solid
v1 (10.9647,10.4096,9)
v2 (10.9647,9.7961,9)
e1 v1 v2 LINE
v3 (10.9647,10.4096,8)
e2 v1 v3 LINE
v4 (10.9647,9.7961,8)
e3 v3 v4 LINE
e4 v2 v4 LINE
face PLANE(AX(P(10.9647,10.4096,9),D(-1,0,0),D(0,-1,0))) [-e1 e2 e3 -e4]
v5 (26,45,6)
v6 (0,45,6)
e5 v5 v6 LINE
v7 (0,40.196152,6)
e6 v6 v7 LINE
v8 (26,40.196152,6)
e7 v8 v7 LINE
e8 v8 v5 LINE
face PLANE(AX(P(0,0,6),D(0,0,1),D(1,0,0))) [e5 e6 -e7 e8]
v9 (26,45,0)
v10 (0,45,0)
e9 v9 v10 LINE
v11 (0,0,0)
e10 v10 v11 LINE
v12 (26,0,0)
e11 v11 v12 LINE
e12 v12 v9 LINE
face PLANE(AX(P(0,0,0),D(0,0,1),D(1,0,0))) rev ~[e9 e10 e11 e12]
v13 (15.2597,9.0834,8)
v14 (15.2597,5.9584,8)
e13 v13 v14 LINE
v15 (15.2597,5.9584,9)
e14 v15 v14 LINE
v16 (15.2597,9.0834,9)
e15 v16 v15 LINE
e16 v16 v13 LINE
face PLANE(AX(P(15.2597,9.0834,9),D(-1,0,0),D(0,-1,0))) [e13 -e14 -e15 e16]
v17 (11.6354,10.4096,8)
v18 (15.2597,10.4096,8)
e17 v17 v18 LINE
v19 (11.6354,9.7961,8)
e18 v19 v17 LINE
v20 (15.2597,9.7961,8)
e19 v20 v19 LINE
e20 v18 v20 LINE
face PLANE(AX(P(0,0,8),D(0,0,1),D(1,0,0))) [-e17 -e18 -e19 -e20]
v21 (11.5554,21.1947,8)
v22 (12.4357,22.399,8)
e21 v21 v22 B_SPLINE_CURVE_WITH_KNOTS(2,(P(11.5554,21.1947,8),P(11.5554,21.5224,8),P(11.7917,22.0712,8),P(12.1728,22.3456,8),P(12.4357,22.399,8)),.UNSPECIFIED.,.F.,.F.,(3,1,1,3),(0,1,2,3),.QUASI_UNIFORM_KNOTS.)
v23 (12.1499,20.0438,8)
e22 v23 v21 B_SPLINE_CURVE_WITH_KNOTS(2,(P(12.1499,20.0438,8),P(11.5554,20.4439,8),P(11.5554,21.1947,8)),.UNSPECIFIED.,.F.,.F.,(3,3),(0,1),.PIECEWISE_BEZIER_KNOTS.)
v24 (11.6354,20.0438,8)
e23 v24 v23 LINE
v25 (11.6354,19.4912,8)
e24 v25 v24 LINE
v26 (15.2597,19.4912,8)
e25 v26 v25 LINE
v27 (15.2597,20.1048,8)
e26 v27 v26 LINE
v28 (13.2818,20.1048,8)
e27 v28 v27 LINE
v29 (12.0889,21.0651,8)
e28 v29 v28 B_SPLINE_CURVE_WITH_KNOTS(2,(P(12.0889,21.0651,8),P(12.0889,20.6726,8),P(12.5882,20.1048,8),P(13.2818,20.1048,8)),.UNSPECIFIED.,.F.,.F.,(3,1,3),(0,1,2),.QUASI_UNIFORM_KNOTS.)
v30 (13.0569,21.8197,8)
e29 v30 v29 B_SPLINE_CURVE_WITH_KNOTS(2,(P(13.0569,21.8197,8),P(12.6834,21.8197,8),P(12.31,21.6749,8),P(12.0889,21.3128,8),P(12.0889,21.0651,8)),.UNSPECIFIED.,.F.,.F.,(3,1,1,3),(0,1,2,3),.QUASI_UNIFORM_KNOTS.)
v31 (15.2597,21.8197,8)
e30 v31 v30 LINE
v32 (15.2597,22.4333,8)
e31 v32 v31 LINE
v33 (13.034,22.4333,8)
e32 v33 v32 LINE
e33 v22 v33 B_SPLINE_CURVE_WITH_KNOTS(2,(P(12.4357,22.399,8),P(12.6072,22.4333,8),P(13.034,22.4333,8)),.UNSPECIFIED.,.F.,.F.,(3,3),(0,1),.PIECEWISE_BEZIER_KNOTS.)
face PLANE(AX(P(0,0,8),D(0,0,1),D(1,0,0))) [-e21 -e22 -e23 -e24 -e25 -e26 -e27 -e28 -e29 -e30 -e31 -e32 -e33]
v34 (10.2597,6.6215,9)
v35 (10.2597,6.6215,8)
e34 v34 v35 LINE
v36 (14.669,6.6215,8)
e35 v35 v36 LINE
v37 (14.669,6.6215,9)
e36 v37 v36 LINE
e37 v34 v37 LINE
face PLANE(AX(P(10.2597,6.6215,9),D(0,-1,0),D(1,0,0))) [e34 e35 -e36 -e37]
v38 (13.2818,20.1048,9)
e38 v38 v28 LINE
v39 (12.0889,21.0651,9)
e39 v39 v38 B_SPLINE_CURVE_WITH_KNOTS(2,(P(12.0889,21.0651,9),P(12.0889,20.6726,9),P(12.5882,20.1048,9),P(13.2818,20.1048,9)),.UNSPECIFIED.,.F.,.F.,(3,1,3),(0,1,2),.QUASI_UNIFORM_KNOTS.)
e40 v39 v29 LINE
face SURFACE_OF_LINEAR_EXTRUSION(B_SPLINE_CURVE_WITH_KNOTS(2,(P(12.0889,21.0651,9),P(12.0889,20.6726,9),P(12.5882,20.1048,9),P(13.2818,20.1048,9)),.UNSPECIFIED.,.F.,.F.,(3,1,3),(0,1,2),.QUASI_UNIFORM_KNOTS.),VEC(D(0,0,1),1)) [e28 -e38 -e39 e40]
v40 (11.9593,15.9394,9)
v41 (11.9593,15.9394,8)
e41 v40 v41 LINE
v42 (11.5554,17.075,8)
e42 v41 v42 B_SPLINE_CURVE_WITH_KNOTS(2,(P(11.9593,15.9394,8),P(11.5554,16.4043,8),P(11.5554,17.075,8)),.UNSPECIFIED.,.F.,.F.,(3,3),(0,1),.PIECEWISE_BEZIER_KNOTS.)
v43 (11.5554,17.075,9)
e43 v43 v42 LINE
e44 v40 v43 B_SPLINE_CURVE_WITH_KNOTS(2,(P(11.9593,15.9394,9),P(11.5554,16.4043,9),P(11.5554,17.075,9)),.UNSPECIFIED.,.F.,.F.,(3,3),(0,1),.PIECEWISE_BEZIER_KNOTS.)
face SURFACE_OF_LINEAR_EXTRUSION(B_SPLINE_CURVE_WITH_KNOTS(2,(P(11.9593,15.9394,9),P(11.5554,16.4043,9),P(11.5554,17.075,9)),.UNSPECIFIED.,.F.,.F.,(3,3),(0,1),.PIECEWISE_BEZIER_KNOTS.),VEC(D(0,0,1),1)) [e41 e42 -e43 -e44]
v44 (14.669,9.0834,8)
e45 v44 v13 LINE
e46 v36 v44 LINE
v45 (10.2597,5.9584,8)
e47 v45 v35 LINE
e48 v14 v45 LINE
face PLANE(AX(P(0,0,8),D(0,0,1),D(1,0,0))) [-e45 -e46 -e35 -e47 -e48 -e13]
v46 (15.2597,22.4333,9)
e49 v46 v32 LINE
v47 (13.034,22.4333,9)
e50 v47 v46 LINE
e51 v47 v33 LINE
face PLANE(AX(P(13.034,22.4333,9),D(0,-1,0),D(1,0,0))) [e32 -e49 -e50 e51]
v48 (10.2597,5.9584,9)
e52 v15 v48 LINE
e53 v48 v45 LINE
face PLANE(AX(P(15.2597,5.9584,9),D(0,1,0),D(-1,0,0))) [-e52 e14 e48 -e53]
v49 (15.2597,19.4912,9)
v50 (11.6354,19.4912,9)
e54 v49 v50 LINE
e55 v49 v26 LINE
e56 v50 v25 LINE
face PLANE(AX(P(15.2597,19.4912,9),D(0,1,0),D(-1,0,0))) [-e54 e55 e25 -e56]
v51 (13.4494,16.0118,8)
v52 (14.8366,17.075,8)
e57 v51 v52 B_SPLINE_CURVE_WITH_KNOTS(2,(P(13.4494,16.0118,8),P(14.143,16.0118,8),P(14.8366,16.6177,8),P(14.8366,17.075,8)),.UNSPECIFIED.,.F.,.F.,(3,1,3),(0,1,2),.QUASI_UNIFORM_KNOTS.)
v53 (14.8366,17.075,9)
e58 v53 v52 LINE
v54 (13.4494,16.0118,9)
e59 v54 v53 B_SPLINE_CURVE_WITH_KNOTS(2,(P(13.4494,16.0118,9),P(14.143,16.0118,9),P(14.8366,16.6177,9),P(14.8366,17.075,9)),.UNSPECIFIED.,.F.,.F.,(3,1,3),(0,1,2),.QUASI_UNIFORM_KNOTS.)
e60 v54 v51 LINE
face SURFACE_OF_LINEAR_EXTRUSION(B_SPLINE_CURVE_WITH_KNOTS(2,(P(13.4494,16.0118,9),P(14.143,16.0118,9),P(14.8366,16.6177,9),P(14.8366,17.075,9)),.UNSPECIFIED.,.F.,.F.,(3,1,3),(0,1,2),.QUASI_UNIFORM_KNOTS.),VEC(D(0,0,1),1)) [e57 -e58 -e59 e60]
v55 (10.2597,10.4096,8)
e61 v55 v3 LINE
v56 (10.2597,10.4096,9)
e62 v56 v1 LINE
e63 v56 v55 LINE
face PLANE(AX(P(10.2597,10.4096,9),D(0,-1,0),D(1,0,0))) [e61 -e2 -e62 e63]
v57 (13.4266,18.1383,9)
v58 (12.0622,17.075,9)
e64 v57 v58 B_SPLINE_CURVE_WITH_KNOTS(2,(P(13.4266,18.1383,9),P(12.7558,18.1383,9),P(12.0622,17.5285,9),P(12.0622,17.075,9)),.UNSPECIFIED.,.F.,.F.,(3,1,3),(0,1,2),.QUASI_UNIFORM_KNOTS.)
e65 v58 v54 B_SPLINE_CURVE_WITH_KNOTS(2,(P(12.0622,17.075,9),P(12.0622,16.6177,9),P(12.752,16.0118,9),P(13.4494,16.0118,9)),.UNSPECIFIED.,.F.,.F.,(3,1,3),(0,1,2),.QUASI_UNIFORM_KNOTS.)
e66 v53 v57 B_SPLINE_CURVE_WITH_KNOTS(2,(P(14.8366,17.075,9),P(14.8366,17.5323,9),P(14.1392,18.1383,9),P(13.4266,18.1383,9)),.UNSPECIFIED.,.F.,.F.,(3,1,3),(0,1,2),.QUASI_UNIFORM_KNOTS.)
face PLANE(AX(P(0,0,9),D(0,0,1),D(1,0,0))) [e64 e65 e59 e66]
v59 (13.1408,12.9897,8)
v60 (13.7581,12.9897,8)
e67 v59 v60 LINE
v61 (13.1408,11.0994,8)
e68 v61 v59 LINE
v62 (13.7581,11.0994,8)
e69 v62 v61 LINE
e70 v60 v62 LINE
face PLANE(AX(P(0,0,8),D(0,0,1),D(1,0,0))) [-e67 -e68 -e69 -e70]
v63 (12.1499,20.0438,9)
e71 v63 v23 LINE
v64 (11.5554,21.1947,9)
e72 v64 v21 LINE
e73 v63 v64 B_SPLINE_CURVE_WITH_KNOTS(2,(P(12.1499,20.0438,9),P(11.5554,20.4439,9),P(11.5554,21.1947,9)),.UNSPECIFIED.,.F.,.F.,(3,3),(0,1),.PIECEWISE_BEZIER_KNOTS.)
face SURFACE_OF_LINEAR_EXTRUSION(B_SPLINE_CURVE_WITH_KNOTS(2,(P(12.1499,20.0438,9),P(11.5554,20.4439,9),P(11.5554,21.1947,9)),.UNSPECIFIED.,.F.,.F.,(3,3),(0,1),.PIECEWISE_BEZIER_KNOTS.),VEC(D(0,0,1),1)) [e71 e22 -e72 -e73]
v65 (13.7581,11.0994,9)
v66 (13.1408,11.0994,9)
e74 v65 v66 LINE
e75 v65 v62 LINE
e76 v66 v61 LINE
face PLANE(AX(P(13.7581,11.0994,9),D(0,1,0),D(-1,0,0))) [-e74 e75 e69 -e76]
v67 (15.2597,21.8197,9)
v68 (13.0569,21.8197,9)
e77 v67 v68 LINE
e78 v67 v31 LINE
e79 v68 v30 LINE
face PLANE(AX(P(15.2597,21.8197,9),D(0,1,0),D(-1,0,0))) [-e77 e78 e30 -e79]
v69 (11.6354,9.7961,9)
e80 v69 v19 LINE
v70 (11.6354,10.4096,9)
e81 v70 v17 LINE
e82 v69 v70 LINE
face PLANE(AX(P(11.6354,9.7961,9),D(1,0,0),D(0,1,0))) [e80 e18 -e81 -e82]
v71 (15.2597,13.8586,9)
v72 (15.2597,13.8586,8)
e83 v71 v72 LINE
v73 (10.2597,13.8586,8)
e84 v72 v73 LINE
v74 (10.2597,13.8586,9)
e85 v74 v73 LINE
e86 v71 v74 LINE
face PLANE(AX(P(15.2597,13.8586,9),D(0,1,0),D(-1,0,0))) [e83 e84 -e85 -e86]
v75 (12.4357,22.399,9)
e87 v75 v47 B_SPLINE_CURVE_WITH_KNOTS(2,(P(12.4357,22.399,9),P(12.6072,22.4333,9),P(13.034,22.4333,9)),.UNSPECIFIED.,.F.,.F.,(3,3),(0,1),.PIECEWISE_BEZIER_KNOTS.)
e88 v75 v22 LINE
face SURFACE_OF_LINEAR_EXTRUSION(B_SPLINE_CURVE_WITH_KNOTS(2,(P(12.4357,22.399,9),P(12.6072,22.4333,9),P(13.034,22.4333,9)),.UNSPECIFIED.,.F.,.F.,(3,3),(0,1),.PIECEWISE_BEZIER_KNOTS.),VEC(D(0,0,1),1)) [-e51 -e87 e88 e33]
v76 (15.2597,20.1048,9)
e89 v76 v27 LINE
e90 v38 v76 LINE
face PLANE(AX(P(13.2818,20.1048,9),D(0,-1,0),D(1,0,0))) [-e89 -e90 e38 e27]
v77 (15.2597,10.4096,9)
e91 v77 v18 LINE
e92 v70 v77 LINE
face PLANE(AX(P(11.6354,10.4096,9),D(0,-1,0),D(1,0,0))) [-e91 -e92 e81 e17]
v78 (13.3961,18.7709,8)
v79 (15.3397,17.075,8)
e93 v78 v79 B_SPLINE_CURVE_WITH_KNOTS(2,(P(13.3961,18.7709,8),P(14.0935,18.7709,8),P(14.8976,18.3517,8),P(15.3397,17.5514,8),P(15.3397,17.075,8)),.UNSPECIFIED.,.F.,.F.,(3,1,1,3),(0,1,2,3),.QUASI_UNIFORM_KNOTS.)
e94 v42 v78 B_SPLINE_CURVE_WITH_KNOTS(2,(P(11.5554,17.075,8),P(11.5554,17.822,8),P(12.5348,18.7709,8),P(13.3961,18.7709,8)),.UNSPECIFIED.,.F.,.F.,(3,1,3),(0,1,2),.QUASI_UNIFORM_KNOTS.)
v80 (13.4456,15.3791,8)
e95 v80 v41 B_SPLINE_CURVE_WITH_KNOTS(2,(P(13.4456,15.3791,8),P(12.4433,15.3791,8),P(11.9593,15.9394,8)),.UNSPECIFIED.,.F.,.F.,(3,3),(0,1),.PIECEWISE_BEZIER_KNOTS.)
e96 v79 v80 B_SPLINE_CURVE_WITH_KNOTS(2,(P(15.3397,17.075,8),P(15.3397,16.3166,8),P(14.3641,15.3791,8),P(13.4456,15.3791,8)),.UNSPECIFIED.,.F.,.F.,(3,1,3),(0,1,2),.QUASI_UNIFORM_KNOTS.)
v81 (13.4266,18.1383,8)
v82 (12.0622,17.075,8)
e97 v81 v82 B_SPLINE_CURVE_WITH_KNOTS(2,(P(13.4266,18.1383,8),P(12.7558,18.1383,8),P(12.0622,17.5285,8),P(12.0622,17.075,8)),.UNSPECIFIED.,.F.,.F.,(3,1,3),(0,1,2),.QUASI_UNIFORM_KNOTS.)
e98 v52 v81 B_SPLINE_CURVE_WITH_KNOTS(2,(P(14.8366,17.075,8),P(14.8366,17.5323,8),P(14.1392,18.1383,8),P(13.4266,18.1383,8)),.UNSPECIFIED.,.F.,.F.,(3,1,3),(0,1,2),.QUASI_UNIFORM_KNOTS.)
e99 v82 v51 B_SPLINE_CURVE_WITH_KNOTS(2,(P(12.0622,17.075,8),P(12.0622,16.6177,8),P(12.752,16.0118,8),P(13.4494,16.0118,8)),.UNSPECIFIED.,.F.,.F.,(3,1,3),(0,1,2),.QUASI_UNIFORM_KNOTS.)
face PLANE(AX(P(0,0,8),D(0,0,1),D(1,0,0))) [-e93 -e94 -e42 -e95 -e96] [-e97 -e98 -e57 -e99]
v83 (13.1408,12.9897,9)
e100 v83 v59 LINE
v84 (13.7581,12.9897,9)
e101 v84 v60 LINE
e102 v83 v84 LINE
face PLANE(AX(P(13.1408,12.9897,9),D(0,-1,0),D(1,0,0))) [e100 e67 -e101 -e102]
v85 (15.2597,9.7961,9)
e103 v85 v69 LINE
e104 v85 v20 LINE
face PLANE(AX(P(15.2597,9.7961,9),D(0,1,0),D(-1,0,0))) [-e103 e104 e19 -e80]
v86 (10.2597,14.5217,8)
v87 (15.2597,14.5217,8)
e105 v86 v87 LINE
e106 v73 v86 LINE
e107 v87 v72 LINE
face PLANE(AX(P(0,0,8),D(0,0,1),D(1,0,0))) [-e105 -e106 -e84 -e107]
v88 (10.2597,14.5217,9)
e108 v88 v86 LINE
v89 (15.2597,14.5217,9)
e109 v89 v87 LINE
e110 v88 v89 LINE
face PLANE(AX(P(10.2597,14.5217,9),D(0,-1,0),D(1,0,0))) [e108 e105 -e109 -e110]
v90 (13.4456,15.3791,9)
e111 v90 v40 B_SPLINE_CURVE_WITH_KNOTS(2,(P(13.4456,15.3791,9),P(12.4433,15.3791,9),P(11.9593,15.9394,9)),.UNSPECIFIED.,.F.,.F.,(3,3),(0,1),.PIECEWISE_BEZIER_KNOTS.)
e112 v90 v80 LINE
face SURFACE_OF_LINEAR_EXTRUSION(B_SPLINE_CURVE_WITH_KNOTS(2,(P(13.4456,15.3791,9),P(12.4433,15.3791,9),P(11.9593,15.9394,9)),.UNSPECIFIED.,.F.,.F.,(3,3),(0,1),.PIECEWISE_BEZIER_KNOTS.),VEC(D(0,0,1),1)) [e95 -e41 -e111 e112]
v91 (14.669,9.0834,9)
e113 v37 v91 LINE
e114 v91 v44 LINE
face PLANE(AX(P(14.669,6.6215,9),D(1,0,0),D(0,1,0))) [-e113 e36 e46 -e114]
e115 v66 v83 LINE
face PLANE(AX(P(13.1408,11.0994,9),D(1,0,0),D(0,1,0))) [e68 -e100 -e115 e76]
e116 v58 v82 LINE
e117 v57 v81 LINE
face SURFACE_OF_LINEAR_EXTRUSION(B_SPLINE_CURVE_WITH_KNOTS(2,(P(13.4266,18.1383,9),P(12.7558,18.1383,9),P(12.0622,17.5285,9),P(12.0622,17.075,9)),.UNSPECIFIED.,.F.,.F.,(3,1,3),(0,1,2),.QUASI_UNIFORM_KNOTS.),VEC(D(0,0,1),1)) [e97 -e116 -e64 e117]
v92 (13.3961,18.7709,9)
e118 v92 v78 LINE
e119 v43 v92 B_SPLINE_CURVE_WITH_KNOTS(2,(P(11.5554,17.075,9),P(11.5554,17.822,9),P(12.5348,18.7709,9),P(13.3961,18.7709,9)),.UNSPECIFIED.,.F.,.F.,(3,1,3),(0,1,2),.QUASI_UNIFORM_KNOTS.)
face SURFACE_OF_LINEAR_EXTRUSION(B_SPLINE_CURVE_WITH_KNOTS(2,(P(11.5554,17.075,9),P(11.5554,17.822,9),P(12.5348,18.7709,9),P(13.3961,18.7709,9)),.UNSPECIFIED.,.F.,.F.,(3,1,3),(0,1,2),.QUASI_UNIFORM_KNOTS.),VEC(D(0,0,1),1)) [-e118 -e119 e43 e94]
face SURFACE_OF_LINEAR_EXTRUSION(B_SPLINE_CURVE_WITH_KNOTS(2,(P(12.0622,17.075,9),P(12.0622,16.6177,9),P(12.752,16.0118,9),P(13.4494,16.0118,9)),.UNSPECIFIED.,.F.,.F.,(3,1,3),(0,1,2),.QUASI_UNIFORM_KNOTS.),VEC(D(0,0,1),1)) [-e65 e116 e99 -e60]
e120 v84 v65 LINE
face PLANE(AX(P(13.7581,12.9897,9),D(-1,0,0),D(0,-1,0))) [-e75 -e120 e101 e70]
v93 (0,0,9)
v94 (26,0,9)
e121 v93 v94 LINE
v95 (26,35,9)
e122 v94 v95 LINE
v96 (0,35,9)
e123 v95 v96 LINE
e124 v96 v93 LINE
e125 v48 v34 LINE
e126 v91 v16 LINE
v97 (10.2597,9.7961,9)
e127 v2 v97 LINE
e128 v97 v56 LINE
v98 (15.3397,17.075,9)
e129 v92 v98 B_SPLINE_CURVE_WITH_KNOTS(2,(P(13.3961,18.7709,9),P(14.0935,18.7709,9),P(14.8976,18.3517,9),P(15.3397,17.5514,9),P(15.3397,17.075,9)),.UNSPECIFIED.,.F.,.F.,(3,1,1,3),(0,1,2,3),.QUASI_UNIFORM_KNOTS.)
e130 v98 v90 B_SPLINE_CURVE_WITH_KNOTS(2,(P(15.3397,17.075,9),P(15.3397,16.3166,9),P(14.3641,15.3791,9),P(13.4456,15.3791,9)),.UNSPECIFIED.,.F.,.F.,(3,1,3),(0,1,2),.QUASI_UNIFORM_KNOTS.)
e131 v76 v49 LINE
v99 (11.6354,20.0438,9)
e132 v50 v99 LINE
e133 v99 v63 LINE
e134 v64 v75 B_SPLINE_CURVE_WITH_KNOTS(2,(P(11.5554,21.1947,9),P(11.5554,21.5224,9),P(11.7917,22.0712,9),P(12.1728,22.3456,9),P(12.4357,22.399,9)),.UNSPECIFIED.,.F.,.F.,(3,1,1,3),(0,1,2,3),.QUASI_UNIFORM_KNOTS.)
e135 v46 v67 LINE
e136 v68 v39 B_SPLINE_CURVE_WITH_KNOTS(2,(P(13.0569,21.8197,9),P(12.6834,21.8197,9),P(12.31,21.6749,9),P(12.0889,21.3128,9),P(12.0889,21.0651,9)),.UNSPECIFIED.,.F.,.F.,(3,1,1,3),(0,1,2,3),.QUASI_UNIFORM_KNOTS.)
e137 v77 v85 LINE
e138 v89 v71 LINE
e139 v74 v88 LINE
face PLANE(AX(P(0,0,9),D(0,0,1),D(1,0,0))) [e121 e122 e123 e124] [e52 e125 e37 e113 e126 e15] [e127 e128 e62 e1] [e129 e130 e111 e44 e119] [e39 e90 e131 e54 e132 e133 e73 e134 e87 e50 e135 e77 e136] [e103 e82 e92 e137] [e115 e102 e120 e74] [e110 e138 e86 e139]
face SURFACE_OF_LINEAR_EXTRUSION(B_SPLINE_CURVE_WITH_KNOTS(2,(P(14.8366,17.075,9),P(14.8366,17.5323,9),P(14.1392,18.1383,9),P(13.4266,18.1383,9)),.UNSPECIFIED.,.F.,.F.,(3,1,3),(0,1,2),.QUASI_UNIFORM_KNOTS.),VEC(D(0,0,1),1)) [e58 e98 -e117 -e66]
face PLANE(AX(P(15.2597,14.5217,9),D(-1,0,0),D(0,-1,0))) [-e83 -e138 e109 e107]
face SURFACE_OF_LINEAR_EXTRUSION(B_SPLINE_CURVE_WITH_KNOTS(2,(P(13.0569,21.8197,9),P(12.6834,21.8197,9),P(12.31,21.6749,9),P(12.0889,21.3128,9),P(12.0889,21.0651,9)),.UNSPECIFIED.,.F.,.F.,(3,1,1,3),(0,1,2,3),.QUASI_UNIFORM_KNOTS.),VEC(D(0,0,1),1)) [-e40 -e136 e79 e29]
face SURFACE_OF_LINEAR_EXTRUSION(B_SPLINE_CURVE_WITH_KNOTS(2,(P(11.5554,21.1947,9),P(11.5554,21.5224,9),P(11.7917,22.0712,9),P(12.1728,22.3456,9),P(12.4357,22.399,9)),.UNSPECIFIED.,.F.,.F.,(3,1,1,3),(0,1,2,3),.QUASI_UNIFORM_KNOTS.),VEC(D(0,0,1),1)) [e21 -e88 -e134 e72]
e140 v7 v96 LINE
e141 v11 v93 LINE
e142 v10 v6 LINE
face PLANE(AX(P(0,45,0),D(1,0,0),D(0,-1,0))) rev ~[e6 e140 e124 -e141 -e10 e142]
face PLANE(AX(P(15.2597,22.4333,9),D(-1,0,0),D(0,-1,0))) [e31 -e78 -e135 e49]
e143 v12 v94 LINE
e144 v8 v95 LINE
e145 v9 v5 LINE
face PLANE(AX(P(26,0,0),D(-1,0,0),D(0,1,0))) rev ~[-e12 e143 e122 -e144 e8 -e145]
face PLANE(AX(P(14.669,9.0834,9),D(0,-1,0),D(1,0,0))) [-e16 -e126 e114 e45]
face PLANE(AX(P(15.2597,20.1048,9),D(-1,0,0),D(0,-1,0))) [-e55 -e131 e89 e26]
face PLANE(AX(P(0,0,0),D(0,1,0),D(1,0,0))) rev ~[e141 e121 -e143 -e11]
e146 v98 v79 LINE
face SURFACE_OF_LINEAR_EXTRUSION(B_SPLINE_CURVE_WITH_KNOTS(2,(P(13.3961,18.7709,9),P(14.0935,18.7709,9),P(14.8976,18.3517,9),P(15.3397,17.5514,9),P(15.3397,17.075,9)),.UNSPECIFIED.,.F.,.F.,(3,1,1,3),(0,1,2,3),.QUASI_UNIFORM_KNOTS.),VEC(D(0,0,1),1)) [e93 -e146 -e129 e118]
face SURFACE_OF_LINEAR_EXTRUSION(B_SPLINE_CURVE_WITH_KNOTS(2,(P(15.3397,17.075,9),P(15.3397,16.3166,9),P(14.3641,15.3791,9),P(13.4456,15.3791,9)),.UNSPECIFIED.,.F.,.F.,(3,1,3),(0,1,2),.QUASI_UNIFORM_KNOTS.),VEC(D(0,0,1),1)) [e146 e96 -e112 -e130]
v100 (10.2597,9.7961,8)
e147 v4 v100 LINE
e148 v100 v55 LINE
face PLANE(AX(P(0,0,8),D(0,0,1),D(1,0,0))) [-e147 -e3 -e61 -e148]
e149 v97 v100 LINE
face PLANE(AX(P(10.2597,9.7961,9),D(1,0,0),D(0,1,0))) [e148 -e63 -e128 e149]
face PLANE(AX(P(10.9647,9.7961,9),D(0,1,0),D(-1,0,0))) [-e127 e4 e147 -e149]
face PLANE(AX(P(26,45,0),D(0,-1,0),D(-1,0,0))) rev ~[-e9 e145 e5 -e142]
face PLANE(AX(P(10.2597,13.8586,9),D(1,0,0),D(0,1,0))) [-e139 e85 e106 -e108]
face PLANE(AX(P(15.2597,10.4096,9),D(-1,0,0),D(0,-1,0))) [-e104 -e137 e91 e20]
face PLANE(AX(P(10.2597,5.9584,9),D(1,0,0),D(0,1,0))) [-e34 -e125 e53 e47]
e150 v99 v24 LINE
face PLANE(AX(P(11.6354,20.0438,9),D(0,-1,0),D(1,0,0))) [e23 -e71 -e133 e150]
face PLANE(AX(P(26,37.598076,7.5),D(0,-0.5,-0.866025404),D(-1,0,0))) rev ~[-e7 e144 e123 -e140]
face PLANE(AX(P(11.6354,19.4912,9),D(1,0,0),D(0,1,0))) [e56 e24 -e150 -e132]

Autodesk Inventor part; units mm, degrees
ref_plane "YZ Plane" through (0, 0, 0) normal (1, 0, 0) x (0, 1, 0)
ref_plane "XZ Plane" through (0, 0, 0) normal (0, 1, 0) x (-1, 0, 0)
ref_plane "XY Plane" through (0, 0, 0) normal (0, 0, 1) x (1, 0, 0)
sketch "Sketch1" plane through (0, 0, 0) normal (0, 0, 1) x (1, 0, 0)
  line L0 (0, 0) -> (26, 0)
  line L1 (26, 0) -> (26, 45)
  line L2 (26, 45) -> (0, 45)
  line L3 (0, 45) -> (0, 0)
  dimension "d0" = 26
  dimension "d1" = 45
extrude "Extrusion1" add sketch "Sketch1" along normal blind 6
sketch "Sketch2" plane through (0, 0, 6) normal (0, 0, 1) x (1, 0, 0)
  line L0 (26, 0) -> (26, 45) projected
  line L1 (0, 0) -> (26, 0)
  line L2 (26, 0) -> (26, 35)
  line L3 (26, 35) -> (0, 35)
  line L4 (0, 35) -> (0, 0)
  dimension "d4" = 35
extrude "Extrusion2" add sketch "Sketch2" along normal blind 3
draft "FaceDraft1" angle 60 pull direction (0, 0, 1) faces at (17.3333, 35, 7) fixed edges at (13, 35, 9)
sketch "Sketch3" plane through (0, 0, 9) normal (0, 0, 1) x (1, 0, 0)
  line L0 (10.2597, 5.4477) -> (10.2597, 19.6754) construction
  line L1 (10.2597, 19.6754) -> (17.2769, 19.6754) construction
  line L2 (17.2769, 19.6754) -> (17.2769, 5.4477) construction
  line L3 (17.2769, 5.4477) -> (10.2597, 5.4477) construction
  line L4 (0, 0) -> (26, 0) projected
  line L5 (13, 0) -> (13, 5.1104)
  line L6 (15.2597, 5.9584) -> (10.2597, 5.9584)
  line L7 (10.2597, 5.9584) -> (10.2597, 6.6215)
  line L8 (10.2597, 6.6215) -> (14.669, 6.6215)
  line L9 (14.669, 6.6215) -> (14.669, 9.0834)
  line L10 (14.669, 9.0834) -> (15.2597, 9.0834)
  line L11 (15.2597, 9.0834) -> (15.2597, 5.9584)
  line L12 (15.2597, 9.7961) -> (11.6354, 9.7961)
  line L13 (11.6354, 9.7961) -> (11.6354, 10.4096)
  line L14 (11.6354, 10.4096) -> (15.2597, 10.4096)
  line L15 (15.2597, 10.4096) -> (15.2597, 9.7961)
  line L16 (10.9647, 9.7961) -> (10.2597, 9.7961)
  line L17 (10.2597, 9.7961) -> (10.2597, 10.4096)
  line L18 (10.2597, 10.4096) -> (10.9647, 10.4096)
  line L19 (10.9647, 10.4096) -> (10.9647, 9.7961)
  line L20 (13.7581, 11.0994) -> (13.1408, 11.0994)
  line L21 (13.1408, 11.0994) -> (13.1408, 12.9897)
  line L22 (13.1408, 12.9897) -> (13.7581, 12.9897)
  line L23 (13.7581, 12.9897) -> (13.7581, 11.0994)
  line L24 (15.2597, 13.8586) -> (10.2597, 13.8586)
  line L25 (10.2597, 13.8586) -> (10.2597, 14.5217)
  line L26 (10.2597, 14.5217) -> (15.2597, 14.5217)
  line L27 (15.2597, 14.5217) -> (15.2597, 13.8586)
  spline S0 degree 2 poles (13.4456, 15.3791) (12.4433, 15.3791) (11.9593, 15.9394) knots 0 0 0 1 1 1
  spline S1 degree 2 poles (11.9593, 15.9394) (11.5554, 16.4043) (11.5554, 17.075) knots 0 0 0 1 1 1
  spline S2 degree 2 poles (11.5554, 17.075) (11.5554, 17.822) (12.5348, 18.7709) (13.3961, 18.7709) knots 0 0 0 1 2 2 2
  spline S3 degree 2 poles (13.3961, 18.7709) (14.0935, 18.7709) (14.8976, 18.3517) (15.3397, 17.5514) (15.3397, 17.075) knots 0 0 0 1 2 3 3 3
  spline S4 degree 2 poles (15.3397, 17.075) (15.3397, 16.3166) (14.3641, 15.3791) (13.4456, 15.3791) knots 0 0 0 1 2 2 2
  spline S5 degree 2 poles (13.4494, 16.0118) (14.143, 16.0118) (14.8366, 16.6177) (14.8366, 17.075) knots 0 0 0 1 2 2 2
  spline S6 degree 2 poles (14.8366, 17.075) (14.8366, 17.5323) (14.1392, 18.1383) (13.4266, 18.1383) knots 0 0 0 1 2 2 2
  spline S7 degree 2 poles (13.4266, 18.1383) (12.7558, 18.1383) (12.0622, 17.5285) (12.0622, 17.075) knots 0 0 0 1 2 2 2
  spline S8 degree 2 poles (12.0622, 17.075) (12.0622, 16.6177) (12.752, 16.0118) (13.4494, 16.0118) knots 0 0 0 1 2 2 2
  line L28 (15.2597, 19.4912) -> (11.6354, 19.4912)
  line L29 (11.6354, 19.4912) -> (11.6354, 20.0438)
  line L30 (11.6354, 20.0438) -> (12.1499, 20.0438)
  spline S9 degree 2 poles (12.1499, 20.0438) (11.5554, 20.4439) (11.5554, 21.1947) knots 0 0 0 1 1 1
  spline S10 degree 2 poles (11.5554, 21.1947) (11.5554, 21.5224) (11.7917, 22.0712) (12.1728, 22.3456) (12.4357, 22.399) knots 0 0 0 1 2 3 3 3
  spline S11 degree 2 poles (12.4357, 22.399) (12.6072, 22.4333) (13.034, 22.4333) knots 0 0 0 1 1 1
  line L31 (13.034, 22.4333) -> (15.2597, 22.4333)
  line L32 (15.2597, 22.4333) -> (15.2597, 21.8197)
  line L33 (15.2597, 21.8197) -> (13.0569, 21.8197)
  spline S12 degree 2 poles (13.0569, 21.8197) (12.6834, 21.8197) (12.31, 21.6749) (12.0889, 21.3128) (12.0889, 21.0651) knots 0 0 0 1 2 3 3 3
  spline S13 degree 2 poles (12.0889, 21.0651) (12.0889, 20.6726) (12.5882, 20.1048) (13.2818, 20.1048) knots 0 0 0 1 2 2 2
  line L34 (13.2818, 20.1048) -> (15.2597, 20.1048)
  line L35 (15.2597, 20.1048) -> (15.2597, 19.4912)
extrude "Extrusion3" cut sketch "Sketch3" against normal blind 1
properties part number "Li-IonBattery"
